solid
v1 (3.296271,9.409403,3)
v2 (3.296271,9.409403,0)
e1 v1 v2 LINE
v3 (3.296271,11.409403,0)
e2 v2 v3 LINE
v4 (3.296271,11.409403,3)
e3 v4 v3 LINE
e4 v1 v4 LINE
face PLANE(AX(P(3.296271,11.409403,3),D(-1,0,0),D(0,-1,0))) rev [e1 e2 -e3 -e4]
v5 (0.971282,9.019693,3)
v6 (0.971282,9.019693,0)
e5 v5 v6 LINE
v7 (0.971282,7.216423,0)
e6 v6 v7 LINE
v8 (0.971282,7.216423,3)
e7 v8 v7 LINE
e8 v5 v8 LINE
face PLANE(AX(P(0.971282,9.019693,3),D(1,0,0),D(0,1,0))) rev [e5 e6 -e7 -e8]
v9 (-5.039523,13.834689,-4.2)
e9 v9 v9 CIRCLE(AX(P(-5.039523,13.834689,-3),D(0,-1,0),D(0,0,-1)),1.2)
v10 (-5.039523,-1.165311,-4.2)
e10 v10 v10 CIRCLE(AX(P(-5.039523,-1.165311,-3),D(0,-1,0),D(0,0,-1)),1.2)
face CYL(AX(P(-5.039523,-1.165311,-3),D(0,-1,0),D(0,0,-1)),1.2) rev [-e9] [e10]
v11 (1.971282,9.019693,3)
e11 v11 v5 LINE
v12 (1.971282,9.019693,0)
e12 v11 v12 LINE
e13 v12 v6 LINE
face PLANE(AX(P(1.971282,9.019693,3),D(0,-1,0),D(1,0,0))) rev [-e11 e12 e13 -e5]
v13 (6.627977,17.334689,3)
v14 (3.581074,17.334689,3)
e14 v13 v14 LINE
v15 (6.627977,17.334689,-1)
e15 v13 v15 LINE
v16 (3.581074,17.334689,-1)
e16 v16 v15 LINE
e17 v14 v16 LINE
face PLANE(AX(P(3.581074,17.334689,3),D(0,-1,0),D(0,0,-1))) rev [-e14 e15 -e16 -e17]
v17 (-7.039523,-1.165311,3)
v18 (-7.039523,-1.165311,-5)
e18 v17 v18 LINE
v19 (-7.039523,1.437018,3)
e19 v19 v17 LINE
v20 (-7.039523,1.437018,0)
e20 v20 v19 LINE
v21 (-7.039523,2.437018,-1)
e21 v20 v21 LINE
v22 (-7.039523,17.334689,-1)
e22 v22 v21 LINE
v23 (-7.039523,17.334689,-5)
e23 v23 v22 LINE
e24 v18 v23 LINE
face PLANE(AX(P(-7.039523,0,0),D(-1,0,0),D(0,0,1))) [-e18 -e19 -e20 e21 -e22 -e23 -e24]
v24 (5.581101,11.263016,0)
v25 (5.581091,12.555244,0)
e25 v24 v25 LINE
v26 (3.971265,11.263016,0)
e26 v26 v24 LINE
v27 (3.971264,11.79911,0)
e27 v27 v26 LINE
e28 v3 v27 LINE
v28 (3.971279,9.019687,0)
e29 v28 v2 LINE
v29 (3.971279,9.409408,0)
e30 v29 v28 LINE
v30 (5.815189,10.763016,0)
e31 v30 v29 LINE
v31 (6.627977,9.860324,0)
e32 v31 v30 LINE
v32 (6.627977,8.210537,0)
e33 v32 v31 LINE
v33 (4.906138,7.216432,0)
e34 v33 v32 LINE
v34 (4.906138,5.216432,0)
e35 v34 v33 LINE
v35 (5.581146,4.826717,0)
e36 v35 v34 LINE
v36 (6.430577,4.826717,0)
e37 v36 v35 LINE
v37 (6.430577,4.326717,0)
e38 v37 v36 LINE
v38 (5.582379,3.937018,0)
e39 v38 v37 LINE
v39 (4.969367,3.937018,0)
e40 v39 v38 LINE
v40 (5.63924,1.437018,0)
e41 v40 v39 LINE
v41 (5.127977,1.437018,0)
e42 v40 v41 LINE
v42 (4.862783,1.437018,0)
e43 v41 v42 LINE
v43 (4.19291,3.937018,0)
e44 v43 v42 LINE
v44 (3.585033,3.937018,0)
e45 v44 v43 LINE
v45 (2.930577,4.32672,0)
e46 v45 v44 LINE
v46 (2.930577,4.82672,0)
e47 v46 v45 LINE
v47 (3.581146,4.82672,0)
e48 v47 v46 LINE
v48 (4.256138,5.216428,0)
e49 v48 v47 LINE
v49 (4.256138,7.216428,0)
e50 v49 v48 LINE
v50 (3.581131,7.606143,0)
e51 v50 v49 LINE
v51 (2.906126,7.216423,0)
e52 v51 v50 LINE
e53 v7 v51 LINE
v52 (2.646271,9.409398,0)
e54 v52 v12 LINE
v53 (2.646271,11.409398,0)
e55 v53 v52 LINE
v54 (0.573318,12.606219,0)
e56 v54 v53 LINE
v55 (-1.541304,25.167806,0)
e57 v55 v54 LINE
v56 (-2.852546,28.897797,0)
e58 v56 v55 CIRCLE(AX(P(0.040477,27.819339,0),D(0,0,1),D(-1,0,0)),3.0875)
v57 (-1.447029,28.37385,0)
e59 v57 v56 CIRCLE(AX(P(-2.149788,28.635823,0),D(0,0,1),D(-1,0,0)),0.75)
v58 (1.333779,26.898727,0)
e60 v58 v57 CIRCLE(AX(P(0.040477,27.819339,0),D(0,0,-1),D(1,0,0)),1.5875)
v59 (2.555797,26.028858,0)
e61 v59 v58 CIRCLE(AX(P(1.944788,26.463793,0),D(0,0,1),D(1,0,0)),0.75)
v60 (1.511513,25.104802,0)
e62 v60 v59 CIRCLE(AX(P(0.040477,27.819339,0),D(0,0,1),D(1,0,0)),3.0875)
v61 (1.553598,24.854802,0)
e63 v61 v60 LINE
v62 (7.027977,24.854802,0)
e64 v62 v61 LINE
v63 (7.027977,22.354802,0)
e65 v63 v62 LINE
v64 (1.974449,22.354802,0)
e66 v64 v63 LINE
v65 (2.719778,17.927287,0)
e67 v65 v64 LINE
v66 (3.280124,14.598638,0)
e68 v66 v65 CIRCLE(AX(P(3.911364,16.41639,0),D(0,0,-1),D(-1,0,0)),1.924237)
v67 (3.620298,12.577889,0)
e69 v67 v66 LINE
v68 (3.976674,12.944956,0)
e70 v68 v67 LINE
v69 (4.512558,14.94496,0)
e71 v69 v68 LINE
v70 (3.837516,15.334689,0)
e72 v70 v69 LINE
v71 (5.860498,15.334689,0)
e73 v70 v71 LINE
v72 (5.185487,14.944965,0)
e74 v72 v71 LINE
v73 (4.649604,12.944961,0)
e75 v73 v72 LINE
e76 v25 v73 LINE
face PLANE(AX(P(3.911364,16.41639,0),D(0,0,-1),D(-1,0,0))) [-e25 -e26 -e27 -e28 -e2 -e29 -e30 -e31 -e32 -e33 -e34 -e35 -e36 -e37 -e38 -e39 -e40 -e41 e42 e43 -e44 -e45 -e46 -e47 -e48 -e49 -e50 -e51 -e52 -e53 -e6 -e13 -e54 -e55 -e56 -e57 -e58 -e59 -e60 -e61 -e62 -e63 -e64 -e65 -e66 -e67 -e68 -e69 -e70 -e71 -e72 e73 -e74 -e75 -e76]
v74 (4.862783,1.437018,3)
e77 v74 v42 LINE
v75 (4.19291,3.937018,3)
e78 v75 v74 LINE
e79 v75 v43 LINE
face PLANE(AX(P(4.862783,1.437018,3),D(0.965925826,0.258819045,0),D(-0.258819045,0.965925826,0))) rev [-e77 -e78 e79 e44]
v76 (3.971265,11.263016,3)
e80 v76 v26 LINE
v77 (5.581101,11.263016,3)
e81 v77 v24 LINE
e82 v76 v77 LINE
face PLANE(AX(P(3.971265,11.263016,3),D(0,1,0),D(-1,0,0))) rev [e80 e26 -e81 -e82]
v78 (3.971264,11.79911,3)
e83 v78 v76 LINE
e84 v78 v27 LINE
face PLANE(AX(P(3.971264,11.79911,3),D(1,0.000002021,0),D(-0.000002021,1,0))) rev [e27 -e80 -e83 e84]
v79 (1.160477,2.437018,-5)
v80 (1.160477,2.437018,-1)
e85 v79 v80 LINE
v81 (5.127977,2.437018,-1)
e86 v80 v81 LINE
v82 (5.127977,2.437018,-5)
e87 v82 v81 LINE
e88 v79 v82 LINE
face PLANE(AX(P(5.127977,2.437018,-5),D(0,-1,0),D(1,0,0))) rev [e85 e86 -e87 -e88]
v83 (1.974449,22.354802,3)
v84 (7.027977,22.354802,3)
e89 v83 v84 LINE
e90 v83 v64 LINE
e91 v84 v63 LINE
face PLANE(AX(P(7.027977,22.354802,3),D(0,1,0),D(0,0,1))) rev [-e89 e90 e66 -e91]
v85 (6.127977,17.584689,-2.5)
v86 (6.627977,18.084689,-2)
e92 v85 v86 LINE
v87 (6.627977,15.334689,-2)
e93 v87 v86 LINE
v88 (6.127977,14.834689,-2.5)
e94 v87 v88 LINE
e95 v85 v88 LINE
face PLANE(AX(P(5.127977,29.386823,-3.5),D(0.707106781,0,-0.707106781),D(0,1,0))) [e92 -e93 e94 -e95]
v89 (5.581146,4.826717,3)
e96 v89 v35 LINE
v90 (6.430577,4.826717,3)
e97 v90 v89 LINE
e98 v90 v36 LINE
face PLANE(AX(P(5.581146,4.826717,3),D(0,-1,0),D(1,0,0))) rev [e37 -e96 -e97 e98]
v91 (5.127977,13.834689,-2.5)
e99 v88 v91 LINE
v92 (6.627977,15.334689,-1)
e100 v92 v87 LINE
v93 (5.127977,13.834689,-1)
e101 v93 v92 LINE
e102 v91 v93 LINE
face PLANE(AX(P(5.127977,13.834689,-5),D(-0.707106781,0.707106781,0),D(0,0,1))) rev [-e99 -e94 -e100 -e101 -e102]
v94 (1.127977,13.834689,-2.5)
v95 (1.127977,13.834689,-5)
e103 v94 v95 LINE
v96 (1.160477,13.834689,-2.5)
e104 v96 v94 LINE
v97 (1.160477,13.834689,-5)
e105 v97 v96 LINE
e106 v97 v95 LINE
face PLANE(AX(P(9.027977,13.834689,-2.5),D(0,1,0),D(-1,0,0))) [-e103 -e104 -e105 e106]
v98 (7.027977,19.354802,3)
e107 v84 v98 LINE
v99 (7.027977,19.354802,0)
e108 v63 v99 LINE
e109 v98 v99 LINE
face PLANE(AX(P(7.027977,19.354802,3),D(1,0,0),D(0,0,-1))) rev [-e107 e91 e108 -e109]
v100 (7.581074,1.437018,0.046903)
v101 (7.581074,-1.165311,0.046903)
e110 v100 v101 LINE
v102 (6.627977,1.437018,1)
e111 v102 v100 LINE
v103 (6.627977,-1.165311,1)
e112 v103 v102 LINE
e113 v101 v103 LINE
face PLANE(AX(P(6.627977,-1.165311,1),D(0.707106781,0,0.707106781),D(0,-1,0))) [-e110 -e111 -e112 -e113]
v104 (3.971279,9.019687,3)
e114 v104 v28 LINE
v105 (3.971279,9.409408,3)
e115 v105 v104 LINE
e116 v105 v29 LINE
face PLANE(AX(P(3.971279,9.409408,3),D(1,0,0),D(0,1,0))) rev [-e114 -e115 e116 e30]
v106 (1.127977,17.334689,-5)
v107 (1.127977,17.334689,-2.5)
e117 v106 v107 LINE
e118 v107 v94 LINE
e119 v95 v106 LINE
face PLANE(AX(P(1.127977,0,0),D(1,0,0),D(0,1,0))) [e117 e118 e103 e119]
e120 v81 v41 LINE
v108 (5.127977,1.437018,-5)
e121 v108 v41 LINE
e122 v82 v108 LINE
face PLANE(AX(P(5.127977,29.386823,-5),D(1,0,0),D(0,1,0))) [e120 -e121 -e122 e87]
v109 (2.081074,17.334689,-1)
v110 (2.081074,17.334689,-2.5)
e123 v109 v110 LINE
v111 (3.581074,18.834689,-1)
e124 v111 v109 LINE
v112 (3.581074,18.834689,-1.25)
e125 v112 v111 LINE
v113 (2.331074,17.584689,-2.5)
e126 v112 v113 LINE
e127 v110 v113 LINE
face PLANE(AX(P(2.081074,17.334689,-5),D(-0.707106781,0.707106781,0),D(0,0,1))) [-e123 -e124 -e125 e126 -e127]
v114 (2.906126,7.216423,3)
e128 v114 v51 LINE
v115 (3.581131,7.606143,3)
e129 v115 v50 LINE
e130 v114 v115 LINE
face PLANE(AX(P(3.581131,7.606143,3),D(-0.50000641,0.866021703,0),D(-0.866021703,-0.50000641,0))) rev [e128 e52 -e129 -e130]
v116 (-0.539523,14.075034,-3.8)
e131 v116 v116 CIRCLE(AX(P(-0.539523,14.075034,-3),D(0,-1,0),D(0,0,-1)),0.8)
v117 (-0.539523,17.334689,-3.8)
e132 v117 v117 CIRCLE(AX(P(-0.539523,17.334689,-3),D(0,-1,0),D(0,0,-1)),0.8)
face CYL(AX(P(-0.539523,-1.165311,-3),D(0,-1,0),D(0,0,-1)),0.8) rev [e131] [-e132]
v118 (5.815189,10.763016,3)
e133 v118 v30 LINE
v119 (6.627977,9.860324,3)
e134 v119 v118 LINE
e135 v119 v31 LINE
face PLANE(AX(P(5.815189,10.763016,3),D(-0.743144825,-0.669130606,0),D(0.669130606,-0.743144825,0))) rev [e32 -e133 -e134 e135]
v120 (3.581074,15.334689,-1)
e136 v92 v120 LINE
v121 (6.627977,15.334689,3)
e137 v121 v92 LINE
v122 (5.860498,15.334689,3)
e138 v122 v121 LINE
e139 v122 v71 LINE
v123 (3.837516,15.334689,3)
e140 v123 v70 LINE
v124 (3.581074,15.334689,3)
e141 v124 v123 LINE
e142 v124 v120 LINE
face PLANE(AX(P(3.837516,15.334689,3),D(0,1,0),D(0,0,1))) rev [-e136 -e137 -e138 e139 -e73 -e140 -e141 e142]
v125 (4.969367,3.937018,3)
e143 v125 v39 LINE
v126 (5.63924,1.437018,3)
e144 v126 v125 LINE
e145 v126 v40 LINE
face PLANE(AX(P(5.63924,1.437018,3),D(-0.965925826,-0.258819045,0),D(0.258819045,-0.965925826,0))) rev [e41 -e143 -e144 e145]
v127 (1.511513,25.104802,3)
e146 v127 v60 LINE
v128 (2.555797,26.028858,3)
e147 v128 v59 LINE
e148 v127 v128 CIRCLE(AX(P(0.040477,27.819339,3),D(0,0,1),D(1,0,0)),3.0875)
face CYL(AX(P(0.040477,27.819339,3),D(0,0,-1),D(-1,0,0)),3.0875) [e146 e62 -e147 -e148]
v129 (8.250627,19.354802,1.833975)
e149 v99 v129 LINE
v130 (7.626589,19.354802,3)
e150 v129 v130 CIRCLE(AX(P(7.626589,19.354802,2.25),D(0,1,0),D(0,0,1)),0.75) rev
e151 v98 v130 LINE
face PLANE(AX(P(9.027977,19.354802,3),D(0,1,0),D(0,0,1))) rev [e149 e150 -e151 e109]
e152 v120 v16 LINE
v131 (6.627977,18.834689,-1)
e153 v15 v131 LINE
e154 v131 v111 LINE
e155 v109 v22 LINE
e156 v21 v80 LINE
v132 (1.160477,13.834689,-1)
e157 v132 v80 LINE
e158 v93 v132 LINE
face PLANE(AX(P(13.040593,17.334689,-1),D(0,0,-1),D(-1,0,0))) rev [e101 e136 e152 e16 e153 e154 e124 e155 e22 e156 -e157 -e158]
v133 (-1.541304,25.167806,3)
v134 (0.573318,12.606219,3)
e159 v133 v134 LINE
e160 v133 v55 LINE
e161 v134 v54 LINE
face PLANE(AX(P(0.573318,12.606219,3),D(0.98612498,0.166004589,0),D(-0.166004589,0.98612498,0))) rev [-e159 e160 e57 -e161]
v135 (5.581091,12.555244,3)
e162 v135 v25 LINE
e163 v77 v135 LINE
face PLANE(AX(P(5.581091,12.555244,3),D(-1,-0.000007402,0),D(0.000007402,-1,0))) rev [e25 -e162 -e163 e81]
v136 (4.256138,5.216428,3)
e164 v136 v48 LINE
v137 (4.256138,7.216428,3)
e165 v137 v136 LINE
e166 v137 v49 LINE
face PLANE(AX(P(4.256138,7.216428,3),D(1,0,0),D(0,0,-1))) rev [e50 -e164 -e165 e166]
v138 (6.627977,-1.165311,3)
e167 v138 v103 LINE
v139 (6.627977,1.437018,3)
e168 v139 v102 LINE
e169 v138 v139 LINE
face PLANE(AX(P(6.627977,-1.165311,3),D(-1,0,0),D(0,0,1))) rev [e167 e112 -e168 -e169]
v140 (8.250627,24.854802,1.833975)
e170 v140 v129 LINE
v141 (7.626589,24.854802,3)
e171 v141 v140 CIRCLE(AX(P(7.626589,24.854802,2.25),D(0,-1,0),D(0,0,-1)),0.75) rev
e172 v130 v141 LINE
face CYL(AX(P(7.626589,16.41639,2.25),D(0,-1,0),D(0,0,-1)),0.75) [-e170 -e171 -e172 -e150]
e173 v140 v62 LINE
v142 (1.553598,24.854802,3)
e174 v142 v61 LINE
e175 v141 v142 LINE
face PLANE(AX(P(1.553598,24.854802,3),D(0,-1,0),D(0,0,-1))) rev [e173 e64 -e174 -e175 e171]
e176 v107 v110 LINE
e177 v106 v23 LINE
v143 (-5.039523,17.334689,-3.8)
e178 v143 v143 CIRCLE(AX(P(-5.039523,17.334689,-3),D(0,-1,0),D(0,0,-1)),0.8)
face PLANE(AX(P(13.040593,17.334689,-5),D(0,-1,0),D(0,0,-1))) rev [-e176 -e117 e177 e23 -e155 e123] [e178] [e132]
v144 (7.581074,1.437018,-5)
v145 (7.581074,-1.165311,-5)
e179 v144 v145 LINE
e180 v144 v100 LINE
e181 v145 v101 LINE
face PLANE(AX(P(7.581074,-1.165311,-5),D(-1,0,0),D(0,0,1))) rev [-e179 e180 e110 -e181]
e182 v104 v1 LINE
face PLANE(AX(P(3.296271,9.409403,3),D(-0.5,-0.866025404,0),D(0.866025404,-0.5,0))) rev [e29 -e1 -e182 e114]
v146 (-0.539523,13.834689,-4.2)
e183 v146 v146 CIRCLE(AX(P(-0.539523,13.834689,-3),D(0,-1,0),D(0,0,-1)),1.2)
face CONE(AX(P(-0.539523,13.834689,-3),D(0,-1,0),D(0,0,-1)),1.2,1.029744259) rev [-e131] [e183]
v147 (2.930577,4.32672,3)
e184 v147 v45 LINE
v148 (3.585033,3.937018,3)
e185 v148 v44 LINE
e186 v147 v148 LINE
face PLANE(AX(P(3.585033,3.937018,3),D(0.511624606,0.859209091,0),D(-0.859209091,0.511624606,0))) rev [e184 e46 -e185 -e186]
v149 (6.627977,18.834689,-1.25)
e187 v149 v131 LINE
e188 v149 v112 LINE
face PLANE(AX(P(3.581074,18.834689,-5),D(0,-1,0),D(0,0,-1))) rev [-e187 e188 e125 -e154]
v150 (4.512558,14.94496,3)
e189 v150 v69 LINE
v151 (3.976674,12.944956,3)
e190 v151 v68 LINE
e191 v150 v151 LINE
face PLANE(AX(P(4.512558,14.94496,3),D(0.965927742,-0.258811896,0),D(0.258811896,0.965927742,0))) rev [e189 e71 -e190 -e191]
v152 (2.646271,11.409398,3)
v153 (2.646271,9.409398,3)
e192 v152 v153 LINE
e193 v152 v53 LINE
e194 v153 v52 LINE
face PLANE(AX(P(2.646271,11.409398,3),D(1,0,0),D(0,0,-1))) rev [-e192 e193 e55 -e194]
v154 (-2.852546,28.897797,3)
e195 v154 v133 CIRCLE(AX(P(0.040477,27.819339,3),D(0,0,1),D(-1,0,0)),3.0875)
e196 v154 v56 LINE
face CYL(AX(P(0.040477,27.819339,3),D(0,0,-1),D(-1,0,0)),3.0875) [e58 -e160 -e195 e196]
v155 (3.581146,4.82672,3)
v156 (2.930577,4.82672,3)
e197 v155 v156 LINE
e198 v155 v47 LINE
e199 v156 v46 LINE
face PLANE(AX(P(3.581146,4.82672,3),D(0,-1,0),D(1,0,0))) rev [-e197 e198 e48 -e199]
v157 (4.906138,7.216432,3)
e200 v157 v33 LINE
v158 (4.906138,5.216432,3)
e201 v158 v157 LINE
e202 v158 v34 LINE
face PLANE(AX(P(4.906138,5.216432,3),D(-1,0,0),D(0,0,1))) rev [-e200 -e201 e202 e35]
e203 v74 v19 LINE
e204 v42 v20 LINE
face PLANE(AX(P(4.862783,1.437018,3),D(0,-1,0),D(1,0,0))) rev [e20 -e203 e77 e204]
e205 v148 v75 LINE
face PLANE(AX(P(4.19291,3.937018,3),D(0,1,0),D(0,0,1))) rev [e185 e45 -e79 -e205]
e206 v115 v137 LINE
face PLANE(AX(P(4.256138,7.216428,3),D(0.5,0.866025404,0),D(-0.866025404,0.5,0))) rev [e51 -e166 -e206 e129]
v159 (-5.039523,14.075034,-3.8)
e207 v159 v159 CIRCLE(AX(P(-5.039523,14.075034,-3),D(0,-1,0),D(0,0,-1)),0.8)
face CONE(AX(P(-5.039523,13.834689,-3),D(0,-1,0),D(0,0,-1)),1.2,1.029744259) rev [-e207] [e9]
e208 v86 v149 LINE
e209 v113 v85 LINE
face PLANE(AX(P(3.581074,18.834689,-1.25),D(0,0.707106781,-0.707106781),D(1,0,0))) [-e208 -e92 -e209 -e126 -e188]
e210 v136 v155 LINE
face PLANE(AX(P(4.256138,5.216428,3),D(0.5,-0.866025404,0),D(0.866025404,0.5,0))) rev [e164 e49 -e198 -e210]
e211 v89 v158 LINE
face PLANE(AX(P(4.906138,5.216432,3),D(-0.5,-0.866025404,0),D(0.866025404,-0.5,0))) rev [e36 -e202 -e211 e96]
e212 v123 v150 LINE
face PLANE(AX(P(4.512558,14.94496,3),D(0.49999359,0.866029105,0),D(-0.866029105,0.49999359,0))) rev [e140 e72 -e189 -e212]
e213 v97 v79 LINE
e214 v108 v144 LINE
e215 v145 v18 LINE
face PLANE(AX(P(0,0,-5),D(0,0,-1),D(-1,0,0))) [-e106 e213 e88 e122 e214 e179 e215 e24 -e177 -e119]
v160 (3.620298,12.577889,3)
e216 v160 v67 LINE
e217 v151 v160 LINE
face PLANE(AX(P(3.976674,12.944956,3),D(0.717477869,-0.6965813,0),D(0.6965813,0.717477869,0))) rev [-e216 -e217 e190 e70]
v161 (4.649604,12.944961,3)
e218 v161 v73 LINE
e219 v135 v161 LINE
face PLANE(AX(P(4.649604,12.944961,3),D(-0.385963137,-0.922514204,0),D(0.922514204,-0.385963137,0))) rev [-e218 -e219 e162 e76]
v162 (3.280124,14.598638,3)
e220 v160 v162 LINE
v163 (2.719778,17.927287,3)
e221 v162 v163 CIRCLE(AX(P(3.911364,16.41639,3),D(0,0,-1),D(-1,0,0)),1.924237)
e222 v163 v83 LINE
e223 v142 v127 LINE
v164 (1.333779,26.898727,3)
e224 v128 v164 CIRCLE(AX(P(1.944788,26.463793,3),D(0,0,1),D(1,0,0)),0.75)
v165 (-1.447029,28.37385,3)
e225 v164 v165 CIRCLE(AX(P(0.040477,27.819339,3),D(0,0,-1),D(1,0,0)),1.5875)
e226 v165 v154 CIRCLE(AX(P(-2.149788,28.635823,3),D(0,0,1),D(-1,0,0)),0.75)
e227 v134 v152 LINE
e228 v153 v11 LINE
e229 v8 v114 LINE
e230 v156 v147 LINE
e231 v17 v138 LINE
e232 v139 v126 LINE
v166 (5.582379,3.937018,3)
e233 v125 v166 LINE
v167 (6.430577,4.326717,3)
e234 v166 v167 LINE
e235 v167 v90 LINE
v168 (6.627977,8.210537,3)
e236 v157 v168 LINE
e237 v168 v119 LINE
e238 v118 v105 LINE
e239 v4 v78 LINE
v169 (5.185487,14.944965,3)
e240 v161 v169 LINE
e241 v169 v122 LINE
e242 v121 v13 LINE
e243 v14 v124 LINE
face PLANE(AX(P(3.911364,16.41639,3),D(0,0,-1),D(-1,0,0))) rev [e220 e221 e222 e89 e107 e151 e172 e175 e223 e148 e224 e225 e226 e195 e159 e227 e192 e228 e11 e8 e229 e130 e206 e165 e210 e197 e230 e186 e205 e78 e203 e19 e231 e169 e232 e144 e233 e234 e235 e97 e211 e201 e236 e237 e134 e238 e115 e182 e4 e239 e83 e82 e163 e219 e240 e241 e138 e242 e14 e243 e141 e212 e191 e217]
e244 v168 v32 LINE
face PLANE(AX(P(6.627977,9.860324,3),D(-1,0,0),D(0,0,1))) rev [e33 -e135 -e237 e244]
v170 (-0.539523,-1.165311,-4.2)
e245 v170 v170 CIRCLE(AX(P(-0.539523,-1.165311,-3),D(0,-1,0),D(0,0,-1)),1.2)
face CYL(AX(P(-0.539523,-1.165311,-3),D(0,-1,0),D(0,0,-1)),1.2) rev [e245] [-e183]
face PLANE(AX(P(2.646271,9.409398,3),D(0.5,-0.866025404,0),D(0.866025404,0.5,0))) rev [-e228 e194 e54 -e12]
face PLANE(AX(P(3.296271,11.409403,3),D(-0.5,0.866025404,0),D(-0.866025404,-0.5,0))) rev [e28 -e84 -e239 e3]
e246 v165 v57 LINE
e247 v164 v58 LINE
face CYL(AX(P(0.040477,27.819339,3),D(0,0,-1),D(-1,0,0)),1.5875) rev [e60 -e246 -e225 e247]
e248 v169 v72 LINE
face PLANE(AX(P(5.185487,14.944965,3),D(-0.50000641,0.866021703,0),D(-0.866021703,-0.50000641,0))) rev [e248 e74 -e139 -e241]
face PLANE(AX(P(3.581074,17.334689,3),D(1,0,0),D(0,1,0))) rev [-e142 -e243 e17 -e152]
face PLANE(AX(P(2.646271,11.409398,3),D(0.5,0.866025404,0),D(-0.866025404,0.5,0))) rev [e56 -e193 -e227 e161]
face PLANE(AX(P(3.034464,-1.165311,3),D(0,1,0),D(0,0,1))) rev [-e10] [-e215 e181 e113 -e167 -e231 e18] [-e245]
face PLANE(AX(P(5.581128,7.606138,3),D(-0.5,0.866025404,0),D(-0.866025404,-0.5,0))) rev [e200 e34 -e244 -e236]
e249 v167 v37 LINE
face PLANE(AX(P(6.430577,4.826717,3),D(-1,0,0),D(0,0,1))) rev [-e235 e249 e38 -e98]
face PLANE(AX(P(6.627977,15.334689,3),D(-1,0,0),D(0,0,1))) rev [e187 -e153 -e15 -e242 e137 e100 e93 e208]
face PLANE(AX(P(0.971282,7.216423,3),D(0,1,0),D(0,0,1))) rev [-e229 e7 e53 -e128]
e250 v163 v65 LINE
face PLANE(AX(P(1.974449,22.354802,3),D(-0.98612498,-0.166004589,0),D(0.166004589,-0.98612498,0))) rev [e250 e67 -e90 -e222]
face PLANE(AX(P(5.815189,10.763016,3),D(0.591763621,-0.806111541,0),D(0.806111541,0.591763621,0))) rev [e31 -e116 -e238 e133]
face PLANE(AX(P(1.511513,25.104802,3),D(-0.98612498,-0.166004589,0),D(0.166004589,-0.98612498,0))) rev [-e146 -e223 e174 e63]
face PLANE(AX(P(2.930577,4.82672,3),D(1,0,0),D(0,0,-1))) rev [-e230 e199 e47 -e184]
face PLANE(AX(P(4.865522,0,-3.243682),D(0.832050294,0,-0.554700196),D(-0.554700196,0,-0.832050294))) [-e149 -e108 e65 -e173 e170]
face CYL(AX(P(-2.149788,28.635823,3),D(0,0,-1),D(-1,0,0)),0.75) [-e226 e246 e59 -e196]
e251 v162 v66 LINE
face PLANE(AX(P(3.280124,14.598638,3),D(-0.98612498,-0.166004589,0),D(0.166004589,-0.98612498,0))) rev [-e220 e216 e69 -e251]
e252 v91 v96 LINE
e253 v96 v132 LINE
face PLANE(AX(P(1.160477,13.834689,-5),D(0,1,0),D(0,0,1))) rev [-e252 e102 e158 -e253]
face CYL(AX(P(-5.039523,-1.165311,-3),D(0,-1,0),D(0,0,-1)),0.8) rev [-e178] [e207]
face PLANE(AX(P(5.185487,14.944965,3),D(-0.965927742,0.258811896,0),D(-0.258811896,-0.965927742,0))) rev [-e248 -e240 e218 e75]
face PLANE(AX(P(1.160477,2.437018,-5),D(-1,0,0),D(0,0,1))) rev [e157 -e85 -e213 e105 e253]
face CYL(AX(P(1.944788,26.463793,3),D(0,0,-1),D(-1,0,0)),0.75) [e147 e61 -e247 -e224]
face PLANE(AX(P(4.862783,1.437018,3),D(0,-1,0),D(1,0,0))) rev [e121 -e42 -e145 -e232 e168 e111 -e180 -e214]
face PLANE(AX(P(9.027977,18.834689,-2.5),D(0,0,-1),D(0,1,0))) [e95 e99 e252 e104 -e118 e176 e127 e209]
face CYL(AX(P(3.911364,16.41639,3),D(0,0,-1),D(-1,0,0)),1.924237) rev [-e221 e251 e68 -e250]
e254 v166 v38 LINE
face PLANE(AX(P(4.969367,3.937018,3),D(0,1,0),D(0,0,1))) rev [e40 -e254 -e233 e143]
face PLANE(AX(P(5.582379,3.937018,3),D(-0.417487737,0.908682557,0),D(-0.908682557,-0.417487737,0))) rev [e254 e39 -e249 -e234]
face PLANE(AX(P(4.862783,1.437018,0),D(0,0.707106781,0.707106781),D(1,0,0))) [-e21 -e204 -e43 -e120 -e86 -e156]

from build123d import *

# Parameters (mm, degrees)
BOSS_SWITCH_BODY_DEPTH                    = 3
SKETCH1_W                                 = 4
SKETCH1_H                                 = 3.5
BOSS_FLANGE_WIDTH_DEPTH                   = 5
BOSS_FLANGE_HEIGHT_REACH                  = 35.863
SKETCH2_W                                 = 4
SKETCH2_H                                 = 2
SKETCH2_W_2                               = 8
SKETCH2_H_2                               = 2.602328973
CUT_UP_TO_DOWN_DERAILLEUR_CLEARANCE_REACH = 21.462
SKETCH10_W                                = 2.453096586
SKETCH10_H                                = 3
SKETCH17_W                                = 12.1675
SKETCH17_H                                = 4
BOSS_FLANGE_SUPPORT_DEPTH                 = 13.897671027
TAP_DRILL_FOR_M2X0_4_TAP1_D               = 1.6
M2_CLEARANCE_HOLE2_D                      = 2.4
M2_CLEARANCE_HOLE2_DEPTH                  = 15
M2_CLEARANCE_HOLE2_TIP                    = 0.721032743
CHAMFER_FLANGE_SUPPORT_SIZE               = 1.5
CHAMFER_FLANGE_SUPPORT_2_SIZE             = 1.5
CHAMFER_FLANGE_SUPPORT_3_SIZE             = 1
SKETCH23_W                                = 3.9675
SKETCH23_H                                = 11.397671027
CUT_GAP_FOR_PRINTING_DEPTH                = 32.000499688
SKETCH25_W                                = 0.953096586
SKETCH25_H                                = 3.5
CUT_DERAILLEUR_CLEARANCE_DEPTH            = 32.145320369
CHAMFER8_SIZE                             = 1
CUT_UP_TO_DOWN_CANTILEVER_SLOPE_REACH     = 34.315
SKETCH26_W                                = 5.907653686
SKETCH26_H                                = 5.795512344
CUT_WIDE_DERAILLEUR_CLEARANCE_DEPTH       = 33.195879702
CUT_WIDE_DERAILLEUR_CLEARANCE_DEPTH_BACK  = 4
SKETCH27_W                                = 2.5
SKETCH27_H                                = 5.000000046
CHAMFER9_SIZE                             = 1.25
SKETCH28_W                                = 3.046903414
SKETCH28_H                                = 1.5
CUT_EXTRUDE1_DEPTH                        = 1
FILLET1_R                                 = 0.75


# Some blends are built 0.0001 mm under size
with BuildPart() as part:
    # Sketch-SwitchBossUp → Boss-Switch Body (new body)
    with BuildSketch(Plane.XY):
        with BuildLine():
            Line((5.581091201, 12.55524379), (5.581100766, 11.263016279))
            Line((5.581100766, 11.263016279), (3.971265023, 11.263016279))
            Line((3.971265023, 11.263016279), (3.97126394, 11.79911022))
            Line((3.97126394, 11.79911022), (3.296271341, 11.409403061))
            Line((3.296271341, 11.409403061), (3.296271341, 9.409403061))
            Line((3.296271341, 9.409403061), (3.971278743, 9.019687356))
            Line((3.971278743, 9.019687356), (3.971278743, 9.409408058))
            Line((3.971278743, 9.409408058), (5.815189336, 10.763016279))
            Line((5.815189336, 10.763016279), (6.627976927, 9.860324207))
            Line((6.627976927, 9.860324207), (6.627976927, 8.210536505))
            Line((6.627976927, 8.210536505), (5.581127833, 7.606137899))
            Line((5.581127833, 7.606137899), (4.906138119, 7.216432406))
            Line((4.906138119, 7.216432406), (4.906138119, 5.216432406))
            Line((4.906138119, 5.216432406), (5.58114552, 4.826716701))
            Line((5.58114552, 4.826716701), (6.430577026, 4.826716701))
            Line((6.430577026, 4.826716701), (6.430577026, 4.326716701))
            Line((6.430577026, 4.326716701), (5.582379266, 3.937018274))
            Line((5.582379266, 3.937018274), (4.969366686, 3.937018274))
            Line((4.969366686, 3.937018274), (5.639239667, 1.437018274))
            Line((5.639239667, 1.437018274), (6.627976927, 1.437018274))
            Line((6.627976927, 1.437018274), (6.627976927, -1.165310699))
            Line((6.627976927, -1.165310699), (3.034464198, -1.165310699))
            Line((3.034464198, -1.165310699), (3.034464198, 1.437018274))
            Line((3.034464198, 1.437018274), (4.862782532, 1.437018274))
            Line((4.862782532, 1.437018274), (4.192909551, 3.937018274))
            Line((4.192909551, 3.937018274), (3.585032728, 3.937018274))
            Line((3.585032728, 3.937018274), (2.930577026, 4.326720436))
            Line((2.930577026, 4.326720436), (2.930577026, 4.826720436))
            Line((2.930577026, 4.826720436), (3.58114552, 4.826720436))
            Line((3.58114552, 4.826720436), (4.256138119, 5.216427595))
            Line((4.256138119, 5.216427595), (4.256138119, 7.216427595))
            Line((4.256138119, 7.216427595), (3.581130717, 7.6061433))
            Line((3.581130717, 7.6061433), (2.9061262, 7.216422599))
            Line((2.9061262, 7.216422599), (0.971281627, 7.216422599))
            Line((0.971281627, 7.216422599), (0.971281627, 9.019692757))
            Line((0.971281627, 9.019692757), (1.971281627, 9.019692757))
            Line((1.971281627, 9.019692757), (2.646271341, 9.40939825))
            Line((2.646271341, 9.40939825), (2.646271341, 11.40939825))
            Line((2.646271341, 11.40939825), (1.696557212, 11.957715958))
            Line((1.696557212, 11.957715958), (0.573317845, 12.60621851))
            Line((0.573317845, 12.60621851), (-1.541303694, 25.167805745))
            ThreePointArc((-1.541303694, 25.167805745), (-2.872284003, 26.795385437), (-2.852546321, 28.897797067))
            ThreePointArc((-2.852546321, 28.897797067), (-1.887813913, 29.338582026), (-1.447028953, 28.373849618))
            ThreePointArc((-1.447028953, 28.373849618), (-0.703448682, 26.416936722), (1.333779254, 26.898727173))
            ThreePointArc((1.333779254, 26.898727173), (2.379722745, 27.074801628), (2.555797201, 26.028858137))
            ThreePointArc((2.555797201, 26.028858137), (2.086504637, 25.507104397), (1.511513111, 25.104801997))
            Line((1.511513111, 25.104801997), (1.553598189, 24.854801997))
            Line((1.553598189, 24.854801997), (9.027976927, 24.854801997))
            Line((9.027976927, 24.854801997), (9.027976927, 22.354801997))
            Line((9.027976927, 22.354801997), (9.027976927, 19.354801997))
            Line((9.027976927, 19.354801997), (7.027976927, 19.354801997))
            Line((7.027976927, 19.354801997), (7.027976927, 22.354801997))
            Line((7.027976927, 22.354801997), (1.974448974, 22.354801997))
            Line((1.974448974, 22.354801997), (2.719778232, 17.927287042))
            ThreePointArc((2.719778232, 17.927287042), (2.013826204, 16.096957693), (3.280124137, 14.598637521))
            Line((3.280124137, 14.598637521), (3.620297651, 12.577888564))
            Line((3.620297651, 12.577888564), (3.976674365, 12.944956135))
            Line((3.976674365, 12.944956135), (4.512557947, 14.944960101))
            Line((4.512557947, 14.944960101), (3.837515632, 15.334689301))
            Line((3.837515632, 15.334689301), (3.581073513, 15.334689301))
            Line((3.581073513, 15.334689301), (3.581073513, 17.334689301))
            Line((3.581073513, 17.334689301), (5.725580434, 17.334689301))
            Line((5.725580434, 17.334689301), (6.627976927, 17.334689301))
            Line((6.627976927, 17.334689301), (6.627976927, 15.334689301))
            Line((6.627976927, 15.334689301), (5.860498075, 15.334689301))
            Line((5.860498075, 15.334689301), (5.185487464, 14.944965082))
            Line((5.185487464, 14.944965082), (4.649603883, 12.944961115))
            Line((4.649603883, 12.944961115), (5.581091201, 12.55524379))
        make_face()
    extrude(amount=BOSS_SWITCH_BODY_DEPTH)

    # Sketch1 → Boss-Flange Width (add)
    with BuildSketch(Plane(origin=(0, 0, 0), x_dir=(-1, 0, 0), z_dir=(0, 0, -1))):
        Polygon((-7.581073513, -1.165310699), (0.412170615, -1.165310699), (0.412170615, 1.437018274), (-3.034464198, 1.437018274), (-4.862782532, 1.437018274), (-5.639239667, 1.437018274), (-6.627976927, 1.437018274), (-7.581073513, 1.437018274), align=None)
        with Locations((-5.581073513, 17.084689301)):
            Rectangle(SKETCH1_W, SKETCH1_H)
    extrude(amount=BOSS_FLANGE_WIDTH_DEPTH)

    # Sketch2 → Boss-Flange Height (add, up to next)
    with BuildSketch(Plane(origin=(-7.039523073, 0, 0), x_dir=(0, 0, -1), z_dir=(1, 0, 0)), mode=Mode.PRIVATE) as boss_flange_height_sk1:
        with Locations((3, 16.334689301)):
            Rectangle(SKETCH2_W, SKETCH2_H)
    boss_flange_height_tool1 = extrude(boss_flange_height_sk1.sketch, amount=BOSS_FLANGE_HEIGHT_REACH, mode=Mode.PRIVATE) - part.part
    # Sketch2 → Boss-Flange Height (add, up to next)
    with BuildSketch(Plane(origin=(-7.039523073, 0, 0), x_dir=(0, 0, -1), z_dir=(1, 0, 0)), mode=Mode.PRIVATE) as boss_flange_height_sk2:
        with Locations((1, 0.135853787)):
            Rectangle(SKETCH2_W_2, SKETCH2_H_2)
    boss_flange_height_tool2 = extrude(boss_flange_height_sk2.sketch, amount=BOSS_FLANGE_HEIGHT_REACH, mode=Mode.PRIVATE) - part.part
    add(boss_flange_height_tool1.solids().sort_by_distance((-7.039523, 16.334689, -3))[0])
    add(boss_flange_height_tool2.solids().sort_by_distance((-7.039523, 0.135854, -1))[0])

    # Sketch10 → Cut-Up-To-Down Derailleur Clearance (cut, up to next)
    with BuildSketch(Plane(origin=(0, 15.334689301, 0), x_dir=(1, 0, 0), z_dir=(0, 1, 0)), mode=Mode.PRIVATE) as cut_up_to_down_derailleur_clearance_sk1:
        with Locations((6.35452522, 3.5)):
            Rectangle(SKETCH10_W, SKETCH10_H)
    cut_up_to_down_derailleur_clearance_tool1 = extrude(cut_up_to_down_derailleur_clearance_sk1.sketch, amount=CUT_UP_TO_DOWN_DERAILLEUR_CLEARANCE_REACH, mode=Mode.PRIVATE) & part.part
    add(cut_up_to_down_derailleur_clearance_tool1.solids().sort_by_distance((6.354525, 15.334689, -3.5))[0], mode=Mode.SUBTRACT)

    # Sketch17 → Boss-Flange Support (add)
    with BuildSketch(Plane.XZ.offset(-15.334689301)):
        with Locations((-0.955773073, -3)):
            Rectangle(SKETCH17_W, SKETCH17_H)
    extrude(amount=BOSS_FLANGE_SUPPORT_DEPTH)

    # Tap Drill for M2x0.4 Tap1 (through all)
    with Locations(Plane(origin=(0, -1.165310699, 0), x_dir=(-1, 0, 0), z_dir=(0, -1, 0))):
        with Locations((5.039523073, 3), (0.539523073, 3)):
            Hole(TAP_DRILL_FOR_M2X0_4_TAP1_D / 2)

    # M2 Clearance Hole2
    with Locations(Plane.XZ.offset(1.165310699)):
        with Locations((-5.039523073, -3), (-0.539523073, -3)):
            Hole(M2_CLEARANCE_HOLE2_D / 2, depth=M2_CLEARANCE_HOLE2_DEPTH)
            with Locations((0, 0, -(M2_CLEARANCE_HOLE2_DEPTH + M2_CLEARANCE_HOLE2_TIP / 2))):  # 118° drill point
                Cone(0, M2_CLEARANCE_HOLE2_D / 2, M2_CLEARANCE_HOLE2_TIP, mode=Mode.SUBTRACT)

    # Chamfer-Flange Support
    chamfer_flange_support_edges = [part.edges().sort_by_distance(p)[0] for p in [
        (3.581073513, 17.334689301, -3),
    ]]
    chamfer(chamfer_flange_support_edges, length=CHAMFER_FLANGE_SUPPORT_SIZE - 0.0001)  # a hair under: the kernel refuses the full size

    # Chamfer-Flange Support 2
    chamfer_flange_support_2_edges = [part.edges().sort_by_distance(p)[0] for p in [
        (5.127976927, 17.084689301, -2),
        (5.127976927, 15.334689301, -1.5),
    ]]
    chamfer(chamfer_flange_support_2_edges, length=CHAMFER_FLANGE_SUPPORT_2_SIZE)

    # Chamfer-Flange Support 3
    chamfer_flange_support_3_edges = [part.edges().sort_by_distance(p)[0] for p in [
        (-0.955773073, 1.437018274, -1),
    ]]
    chamfer(chamfer_flange_support_3_edges, length=CHAMFER_FLANGE_SUPPORT_3_SIZE - 0.0001)  # a hair under: the kernel refuses the full size

    # Sketch23 → Cut-Gap for Printing (cut, through all)
    with BuildSketch(Plane.XY.offset(-1)):
        with Locations((3.144226927, 8.135853788)):
            Rectangle(SKETCH23_W, SKETCH23_H)
    extrude(amount=-CUT_GAP_FOR_PRINTING_DEPTH, mode=Mode.SUBTRACT)

    # Sketch25 → Cut-Derailleur Clearance (cut, through all)
    with BuildSketch(Plane.XY):
        with Locations((7.10452522, 17.084689301)):
            Rectangle(SKETCH25_W, SKETCH25_H)
    extrude(amount=-CUT_DERAILLEUR_CLEARANCE_DEPTH, mode=Mode.SUBTRACT)

    # Chamfer8
    # the kernel refuses this chamfer: 1 mm, written as the material it adds along each edge
    with BuildSketch(Plane(origin=(6.627976927, 1.437018274, 0), x_dir=(0.9996219169112968, 0, -0.027495876610586365), z_dir=(0, -1, 0))) as chamfer8_piece_1_section:
        Polygon((CHAMFER8_SIZE * 0.999621916911, CHAMFER8_SIZE * 0.0274958766106), (-CHAMFER8_SIZE * 0.0274958766106, CHAMFER8_SIZE * 0.999621916911), (0, 0), align=None)
    chamfer8_piece_1 = extrude(amount=2.602328973, mode=Mode.PRIVATE)
    chamfer8_piece_1 = split(chamfer8_piece_1, bisect_by=Plane(origin=(7.581073513, 0.135853788, 0.332375145), z_dir=(-1, 0, 0)), keep=Keep.TOP, mode=Mode.PRIVATE)
    add(chamfer8_piece_1)

    # Sketch26 → Cut-Up-to-Down Cantilever Slope (cut, up to next)
    with BuildSketch(Plane(origin=(4.865522488, 0, -3.243681659), x_dir=(0.5547001962252291, 0, 0.8320502943378437), z_dir=(-0.8320502943378437, 0, 0.5547001962252291)), mode=Mode.PRIVATE) as cut_up_to_down_cantilever_slope_sk1:
        with Locations((5.823012163, 21.957045825)):
            Rectangle(SKETCH26_W, SKETCH26_H)
    cut_up_to_down_cantilever_slope_tool1 = extrude(cut_up_to_down_cantilever_slope_sk1.sketch, amount=-CUT_UP_TO_DOWN_CANTILEVER_SLOPE_REACH, mode=Mode.PRIVATE) & part.part
    add(cut_up_to_down_cantilever_slope_tool1.solids().sort_by_distance((8.095548, 21.957046, 1.601357))[0], mode=Mode.SUBTRACT)

    # Sketch27 → Cut-Wide Derailleur Clearance (cut, two sides: drawn at the far end of the back side and taken through both)
    with BuildSketch(Plane(origin=(5.127976927, 0, 0), x_dir=(0, 0, -1), z_dir=(1, 0, 0)).offset(-CUT_WIDE_DERAILLEUR_CLEARANCE_DEPTH_BACK)):
        with Locations((3.75, 16.334689324)):
            Rectangle(SKETCH27_W, SKETCH27_H)
    extrude(amount=CUT_WIDE_DERAILLEUR_CLEARANCE_DEPTH + CUT_WIDE_DERAILLEUR_CLEARANCE_DEPTH_BACK, mode=Mode.SUBTRACT)

    # Chamfer9
    chamfer9_edges = [part.edges().sort_by_distance(p)[0] for p in [
        (4.85452522, 18.834689347, -2.5),
    ]]
    chamfer(chamfer9_edges, length=CHAMFER9_SIZE)

    # Sketch28 → Cut-Extrude1 (cut)
    with BuildSketch(Plane.XY.offset(-1)):
        with Locations((5.10452522, 18.084689301)):
            Rectangle(SKETCH28_W, SKETCH28_H)
    extrude(amount=CUT_EXTRUDE1_DEPTH, mode=Mode.SUBTRACT)

    # Fillet1
    fillet1_edges = [part.edges().sort_by_distance(p)[0] for p in [
        (9.027976927, 22.104801997, 3),
    ]]
    fillet(fillet1_edges, radius=FILLET1_R)


solid = part.part
